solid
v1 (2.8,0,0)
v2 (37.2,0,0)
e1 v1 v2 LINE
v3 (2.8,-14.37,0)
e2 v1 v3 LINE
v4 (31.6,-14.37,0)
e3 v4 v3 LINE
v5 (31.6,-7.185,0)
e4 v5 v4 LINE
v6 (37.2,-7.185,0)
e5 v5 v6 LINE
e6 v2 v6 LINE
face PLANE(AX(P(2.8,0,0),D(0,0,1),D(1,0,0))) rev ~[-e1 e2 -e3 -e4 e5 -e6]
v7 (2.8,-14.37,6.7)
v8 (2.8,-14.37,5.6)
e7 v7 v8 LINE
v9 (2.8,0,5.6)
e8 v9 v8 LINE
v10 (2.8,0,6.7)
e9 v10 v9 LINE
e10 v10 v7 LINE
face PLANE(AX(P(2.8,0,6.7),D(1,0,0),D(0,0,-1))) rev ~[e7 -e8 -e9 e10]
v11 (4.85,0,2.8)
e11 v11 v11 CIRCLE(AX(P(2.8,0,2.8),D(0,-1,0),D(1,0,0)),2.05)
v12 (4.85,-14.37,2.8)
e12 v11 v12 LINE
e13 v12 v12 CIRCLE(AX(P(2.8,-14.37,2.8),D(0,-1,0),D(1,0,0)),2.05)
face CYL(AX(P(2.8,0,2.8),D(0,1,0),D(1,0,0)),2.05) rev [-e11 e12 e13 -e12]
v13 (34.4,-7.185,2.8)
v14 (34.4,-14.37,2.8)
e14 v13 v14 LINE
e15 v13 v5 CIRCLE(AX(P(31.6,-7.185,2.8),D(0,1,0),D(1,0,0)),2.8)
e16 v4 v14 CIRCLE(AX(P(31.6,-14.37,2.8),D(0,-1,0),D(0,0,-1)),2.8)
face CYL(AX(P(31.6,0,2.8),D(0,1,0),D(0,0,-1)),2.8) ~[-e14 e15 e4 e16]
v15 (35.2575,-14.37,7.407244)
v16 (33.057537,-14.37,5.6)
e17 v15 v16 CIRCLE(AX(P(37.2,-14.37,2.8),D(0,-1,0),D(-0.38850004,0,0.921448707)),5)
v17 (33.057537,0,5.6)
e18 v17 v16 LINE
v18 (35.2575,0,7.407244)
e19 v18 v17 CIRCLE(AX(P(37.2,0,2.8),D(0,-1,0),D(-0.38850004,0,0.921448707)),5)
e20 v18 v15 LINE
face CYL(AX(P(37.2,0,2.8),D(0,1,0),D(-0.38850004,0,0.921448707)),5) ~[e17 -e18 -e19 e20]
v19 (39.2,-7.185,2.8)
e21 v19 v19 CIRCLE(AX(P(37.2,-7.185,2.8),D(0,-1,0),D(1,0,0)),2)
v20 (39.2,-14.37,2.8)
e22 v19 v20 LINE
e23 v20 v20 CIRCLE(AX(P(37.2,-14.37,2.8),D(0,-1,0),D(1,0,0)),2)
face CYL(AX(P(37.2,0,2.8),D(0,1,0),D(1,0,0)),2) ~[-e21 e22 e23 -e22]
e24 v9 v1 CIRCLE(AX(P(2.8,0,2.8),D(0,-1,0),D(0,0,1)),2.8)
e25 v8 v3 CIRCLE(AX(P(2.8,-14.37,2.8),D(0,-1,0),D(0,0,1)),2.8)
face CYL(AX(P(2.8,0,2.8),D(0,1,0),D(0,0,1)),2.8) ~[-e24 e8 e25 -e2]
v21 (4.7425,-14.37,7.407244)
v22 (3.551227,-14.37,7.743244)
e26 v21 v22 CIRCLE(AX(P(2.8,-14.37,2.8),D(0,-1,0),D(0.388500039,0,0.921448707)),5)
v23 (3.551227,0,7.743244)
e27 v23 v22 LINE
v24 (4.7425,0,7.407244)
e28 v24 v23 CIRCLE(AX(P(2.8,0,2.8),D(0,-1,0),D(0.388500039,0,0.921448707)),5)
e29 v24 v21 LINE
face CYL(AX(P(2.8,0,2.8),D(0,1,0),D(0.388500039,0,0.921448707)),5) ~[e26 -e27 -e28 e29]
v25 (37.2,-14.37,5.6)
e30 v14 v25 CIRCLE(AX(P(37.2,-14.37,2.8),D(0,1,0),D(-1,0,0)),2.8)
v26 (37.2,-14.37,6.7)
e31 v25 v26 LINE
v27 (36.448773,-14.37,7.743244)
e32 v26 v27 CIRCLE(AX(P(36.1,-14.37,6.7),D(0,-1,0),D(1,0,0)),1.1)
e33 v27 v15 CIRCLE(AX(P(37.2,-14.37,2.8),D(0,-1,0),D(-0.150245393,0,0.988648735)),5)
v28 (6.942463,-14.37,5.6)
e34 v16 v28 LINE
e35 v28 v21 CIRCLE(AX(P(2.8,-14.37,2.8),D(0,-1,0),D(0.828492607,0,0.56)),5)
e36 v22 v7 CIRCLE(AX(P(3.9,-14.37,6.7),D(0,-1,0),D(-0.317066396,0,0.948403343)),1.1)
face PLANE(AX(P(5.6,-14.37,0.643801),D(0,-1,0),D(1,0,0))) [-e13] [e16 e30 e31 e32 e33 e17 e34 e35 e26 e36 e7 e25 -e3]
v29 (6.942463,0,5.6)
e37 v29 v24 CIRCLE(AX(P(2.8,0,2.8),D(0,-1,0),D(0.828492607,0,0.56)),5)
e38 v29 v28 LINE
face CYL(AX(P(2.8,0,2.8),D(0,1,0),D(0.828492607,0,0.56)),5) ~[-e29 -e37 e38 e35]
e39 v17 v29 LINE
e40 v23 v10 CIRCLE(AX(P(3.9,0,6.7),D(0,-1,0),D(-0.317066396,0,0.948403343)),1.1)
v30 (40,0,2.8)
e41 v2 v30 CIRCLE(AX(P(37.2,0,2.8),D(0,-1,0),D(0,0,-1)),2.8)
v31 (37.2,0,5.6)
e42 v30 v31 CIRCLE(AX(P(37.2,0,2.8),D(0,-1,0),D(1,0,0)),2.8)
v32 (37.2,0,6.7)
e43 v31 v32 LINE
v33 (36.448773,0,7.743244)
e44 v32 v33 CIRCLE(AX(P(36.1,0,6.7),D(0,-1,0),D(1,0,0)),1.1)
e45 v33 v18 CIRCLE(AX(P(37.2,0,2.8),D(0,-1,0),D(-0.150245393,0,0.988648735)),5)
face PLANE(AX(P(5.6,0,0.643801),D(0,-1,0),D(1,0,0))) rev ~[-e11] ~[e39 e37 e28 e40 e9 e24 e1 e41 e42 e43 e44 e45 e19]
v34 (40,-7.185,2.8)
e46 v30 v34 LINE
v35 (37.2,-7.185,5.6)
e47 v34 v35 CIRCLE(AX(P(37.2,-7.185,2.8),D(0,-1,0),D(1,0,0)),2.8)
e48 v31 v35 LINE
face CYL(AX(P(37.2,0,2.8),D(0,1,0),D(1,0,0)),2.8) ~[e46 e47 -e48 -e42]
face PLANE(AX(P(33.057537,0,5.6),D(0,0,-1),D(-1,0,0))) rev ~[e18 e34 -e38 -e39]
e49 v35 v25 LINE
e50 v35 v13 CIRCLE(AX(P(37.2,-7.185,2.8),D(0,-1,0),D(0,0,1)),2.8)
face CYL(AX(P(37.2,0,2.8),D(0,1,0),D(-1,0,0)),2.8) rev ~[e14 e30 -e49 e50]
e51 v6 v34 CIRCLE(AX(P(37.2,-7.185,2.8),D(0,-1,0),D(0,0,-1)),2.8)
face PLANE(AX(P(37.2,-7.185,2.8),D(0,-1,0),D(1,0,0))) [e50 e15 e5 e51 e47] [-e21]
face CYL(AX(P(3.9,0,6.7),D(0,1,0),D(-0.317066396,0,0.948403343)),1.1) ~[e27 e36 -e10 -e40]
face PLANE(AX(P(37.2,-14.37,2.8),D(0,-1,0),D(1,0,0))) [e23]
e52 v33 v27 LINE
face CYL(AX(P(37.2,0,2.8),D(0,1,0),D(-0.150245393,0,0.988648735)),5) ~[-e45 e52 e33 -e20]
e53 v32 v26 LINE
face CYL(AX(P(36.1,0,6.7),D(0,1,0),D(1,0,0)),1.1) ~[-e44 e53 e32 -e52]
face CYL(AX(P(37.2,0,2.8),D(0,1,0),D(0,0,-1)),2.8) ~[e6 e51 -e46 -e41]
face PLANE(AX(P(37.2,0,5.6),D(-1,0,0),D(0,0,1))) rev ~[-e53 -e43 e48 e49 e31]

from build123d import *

# Parameters (mm, degrees)
F0_R     = 2
F1_DEPTH = 14.37
F2_DEPTH = 14.37
F3_DEPTH = 7.185
F0_R_2   = 2.05
F4_DEPTH = 14.37


# Not quite as in the source:
# - a feature names something its author has since deleted; it is built from what else it names


with BuildPart() as f1:
    # F0 (on Front) → F1 (new body)
    with BuildSketch(Plane.XZ):
        with Locations((37.2, 2.8)):
            Circle(F0_R)
    extrude(amount=F1_DEPTH)



with BuildPart() as f2:
    # F0 (on Front) → F2 (new body)
    with BuildSketch(Plane.XZ):
        with BuildLine():
            ThreePointArc((5.6, 2.8), (6.4201010127, 0.8201010127), (8.4, 0))
            Line((8.4, 0), (31.6, 0))
            ThreePointArc((31.6, 0), (33.5798989873, 0.8201010127), (34.4, 2.8))
            ThreePointArc((34.4, 2.8), (35.2201010127, 4.7798989873), (37.2, 5.6))
            Line((37.2, 5.6), (37.2, 6.7))
            ThreePointArc((37.2, 6.7), (36.9926506427, 7.3427867688), (36.4487730361, 7.7432436768))
            ThreePointArc((36.4487730361, 7.7432436768), (35.8426991749, 7.6122483799), (35.2574998019, 7.4072435339))
            ThreePointArc((35.2574998019, 7.4072435339), (35.103012566, 6.2352247249), (36.1, 5.6))
            Line((36.1, 5.6), (33.0575369646, 5.6))
            Line((33.0575369646, 5.6), (6.9424630354, 5.6))
            Line((6.9424630354, 5.6), (3.9, 5.6))
            ThreePointArc((3.9, 5.6), (4.896987434, 6.2352247249), (4.7425001981, 7.4072435339))
            ThreePointArc((4.7425001981, 7.4072435339), (4.1573008251, 7.6122483799), (3.5512269639, 7.7432436768))
            ThreePointArc((3.5512269639, 7.7432436768), (3.0073493573, 7.3427867688), (2.8, 6.7))
            Line((2.8, 6.7), (2.8, 5.6))
            ThreePointArc((2.8, 5.6), (4.7798989873, 4.7798989873), (5.6, 2.8))
        make_face()
        with BuildLine():
            ThreePointArc((35.2574998019, 7.4072435339), (34.0261653027, 6.6635182559), (33.0575369646, 5.6))
            Line((33.0575369646, 5.6), (36.1, 5.6))
            ThreePointArc((36.1, 5.6), (35.103012566, 6.2352247249), (35.2574998019, 7.4072435339))
        make_face()
        with BuildLine():
            ThreePointArc((6.9424630354, 5.6), (5.9738346973, 6.6635182559), (4.7425001981, 7.4072435339))
            ThreePointArc((4.7425001981, 7.4072435339), (4.896987434, 6.2352247249), (3.9, 5.6))
            Line((3.9, 5.6), (6.9424630354, 5.6))
        make_face()
    extrude(amount=F2_DEPTH)


with BuildPart() as f1_1:
    add(f1.part)

    add(f2.part)  # F3 merges F2
    # F0 (on Front) → F3 (join)
    with BuildSketch(Plane.XZ):
        with BuildLine():
            ThreePointArc((34.4, 2.8), (35.2201010127, 0.8201010127), (37.2, 0))
            ThreePointArc((37.2, 0), (39.1798989873, 0.8201010127), (40, 2.8))
            ThreePointArc((40, 2.8), (39.1798989873, 4.7798989873), (37.2, 5.6))
            ThreePointArc((37.2, 5.6), (35.2201010127, 4.7798989873), (34.4, 2.8))
        make_face()
        with Locations((37.2, 2.8)):
            Circle(F0_R, mode=Mode.SUBTRACT)
        with BuildLine():
            ThreePointArc((34.4, 2.8), (33.5798989873, 0.8201010127), (31.6, 0))
            Line((31.6, 0), (37.2, 0))
            ThreePointArc((37.2, 0), (35.2201010127, 0.8201010127), (34.4, 2.8))
        make_face()
    extrude(amount=F3_DEPTH)

    # F0 (on Front) → F4 (join)
    with BuildSketch(Plane.XZ):
        with BuildLine():
            ThreePointArc((5.6, 2.8), (4.7798989873, 0.8201010127), (2.8, 0))
            Line((2.8, 0), (8.4, 0))
            ThreePointArc((8.4, 0), (6.4201010127, 0.8201010127), (5.6, 2.8))
        make_face()
        with BuildLine():
            ThreePointArc((2.8, 5.6), (0, 2.8), (2.8, 0))
            ThreePointArc((2.8, 0), (4.7798989873, 0.8201010127), (5.6, 2.8))
            ThreePointArc((5.6, 2.8), (4.7798989873, 4.7798989873), (2.8, 5.6))
        make_face()
        with Locations((2.8, 2.8)):
            Circle(F0_R_2, mode=Mode.SUBTRACT)
    extrude(amount=F4_DEPTH)


solid = f1_1.part
